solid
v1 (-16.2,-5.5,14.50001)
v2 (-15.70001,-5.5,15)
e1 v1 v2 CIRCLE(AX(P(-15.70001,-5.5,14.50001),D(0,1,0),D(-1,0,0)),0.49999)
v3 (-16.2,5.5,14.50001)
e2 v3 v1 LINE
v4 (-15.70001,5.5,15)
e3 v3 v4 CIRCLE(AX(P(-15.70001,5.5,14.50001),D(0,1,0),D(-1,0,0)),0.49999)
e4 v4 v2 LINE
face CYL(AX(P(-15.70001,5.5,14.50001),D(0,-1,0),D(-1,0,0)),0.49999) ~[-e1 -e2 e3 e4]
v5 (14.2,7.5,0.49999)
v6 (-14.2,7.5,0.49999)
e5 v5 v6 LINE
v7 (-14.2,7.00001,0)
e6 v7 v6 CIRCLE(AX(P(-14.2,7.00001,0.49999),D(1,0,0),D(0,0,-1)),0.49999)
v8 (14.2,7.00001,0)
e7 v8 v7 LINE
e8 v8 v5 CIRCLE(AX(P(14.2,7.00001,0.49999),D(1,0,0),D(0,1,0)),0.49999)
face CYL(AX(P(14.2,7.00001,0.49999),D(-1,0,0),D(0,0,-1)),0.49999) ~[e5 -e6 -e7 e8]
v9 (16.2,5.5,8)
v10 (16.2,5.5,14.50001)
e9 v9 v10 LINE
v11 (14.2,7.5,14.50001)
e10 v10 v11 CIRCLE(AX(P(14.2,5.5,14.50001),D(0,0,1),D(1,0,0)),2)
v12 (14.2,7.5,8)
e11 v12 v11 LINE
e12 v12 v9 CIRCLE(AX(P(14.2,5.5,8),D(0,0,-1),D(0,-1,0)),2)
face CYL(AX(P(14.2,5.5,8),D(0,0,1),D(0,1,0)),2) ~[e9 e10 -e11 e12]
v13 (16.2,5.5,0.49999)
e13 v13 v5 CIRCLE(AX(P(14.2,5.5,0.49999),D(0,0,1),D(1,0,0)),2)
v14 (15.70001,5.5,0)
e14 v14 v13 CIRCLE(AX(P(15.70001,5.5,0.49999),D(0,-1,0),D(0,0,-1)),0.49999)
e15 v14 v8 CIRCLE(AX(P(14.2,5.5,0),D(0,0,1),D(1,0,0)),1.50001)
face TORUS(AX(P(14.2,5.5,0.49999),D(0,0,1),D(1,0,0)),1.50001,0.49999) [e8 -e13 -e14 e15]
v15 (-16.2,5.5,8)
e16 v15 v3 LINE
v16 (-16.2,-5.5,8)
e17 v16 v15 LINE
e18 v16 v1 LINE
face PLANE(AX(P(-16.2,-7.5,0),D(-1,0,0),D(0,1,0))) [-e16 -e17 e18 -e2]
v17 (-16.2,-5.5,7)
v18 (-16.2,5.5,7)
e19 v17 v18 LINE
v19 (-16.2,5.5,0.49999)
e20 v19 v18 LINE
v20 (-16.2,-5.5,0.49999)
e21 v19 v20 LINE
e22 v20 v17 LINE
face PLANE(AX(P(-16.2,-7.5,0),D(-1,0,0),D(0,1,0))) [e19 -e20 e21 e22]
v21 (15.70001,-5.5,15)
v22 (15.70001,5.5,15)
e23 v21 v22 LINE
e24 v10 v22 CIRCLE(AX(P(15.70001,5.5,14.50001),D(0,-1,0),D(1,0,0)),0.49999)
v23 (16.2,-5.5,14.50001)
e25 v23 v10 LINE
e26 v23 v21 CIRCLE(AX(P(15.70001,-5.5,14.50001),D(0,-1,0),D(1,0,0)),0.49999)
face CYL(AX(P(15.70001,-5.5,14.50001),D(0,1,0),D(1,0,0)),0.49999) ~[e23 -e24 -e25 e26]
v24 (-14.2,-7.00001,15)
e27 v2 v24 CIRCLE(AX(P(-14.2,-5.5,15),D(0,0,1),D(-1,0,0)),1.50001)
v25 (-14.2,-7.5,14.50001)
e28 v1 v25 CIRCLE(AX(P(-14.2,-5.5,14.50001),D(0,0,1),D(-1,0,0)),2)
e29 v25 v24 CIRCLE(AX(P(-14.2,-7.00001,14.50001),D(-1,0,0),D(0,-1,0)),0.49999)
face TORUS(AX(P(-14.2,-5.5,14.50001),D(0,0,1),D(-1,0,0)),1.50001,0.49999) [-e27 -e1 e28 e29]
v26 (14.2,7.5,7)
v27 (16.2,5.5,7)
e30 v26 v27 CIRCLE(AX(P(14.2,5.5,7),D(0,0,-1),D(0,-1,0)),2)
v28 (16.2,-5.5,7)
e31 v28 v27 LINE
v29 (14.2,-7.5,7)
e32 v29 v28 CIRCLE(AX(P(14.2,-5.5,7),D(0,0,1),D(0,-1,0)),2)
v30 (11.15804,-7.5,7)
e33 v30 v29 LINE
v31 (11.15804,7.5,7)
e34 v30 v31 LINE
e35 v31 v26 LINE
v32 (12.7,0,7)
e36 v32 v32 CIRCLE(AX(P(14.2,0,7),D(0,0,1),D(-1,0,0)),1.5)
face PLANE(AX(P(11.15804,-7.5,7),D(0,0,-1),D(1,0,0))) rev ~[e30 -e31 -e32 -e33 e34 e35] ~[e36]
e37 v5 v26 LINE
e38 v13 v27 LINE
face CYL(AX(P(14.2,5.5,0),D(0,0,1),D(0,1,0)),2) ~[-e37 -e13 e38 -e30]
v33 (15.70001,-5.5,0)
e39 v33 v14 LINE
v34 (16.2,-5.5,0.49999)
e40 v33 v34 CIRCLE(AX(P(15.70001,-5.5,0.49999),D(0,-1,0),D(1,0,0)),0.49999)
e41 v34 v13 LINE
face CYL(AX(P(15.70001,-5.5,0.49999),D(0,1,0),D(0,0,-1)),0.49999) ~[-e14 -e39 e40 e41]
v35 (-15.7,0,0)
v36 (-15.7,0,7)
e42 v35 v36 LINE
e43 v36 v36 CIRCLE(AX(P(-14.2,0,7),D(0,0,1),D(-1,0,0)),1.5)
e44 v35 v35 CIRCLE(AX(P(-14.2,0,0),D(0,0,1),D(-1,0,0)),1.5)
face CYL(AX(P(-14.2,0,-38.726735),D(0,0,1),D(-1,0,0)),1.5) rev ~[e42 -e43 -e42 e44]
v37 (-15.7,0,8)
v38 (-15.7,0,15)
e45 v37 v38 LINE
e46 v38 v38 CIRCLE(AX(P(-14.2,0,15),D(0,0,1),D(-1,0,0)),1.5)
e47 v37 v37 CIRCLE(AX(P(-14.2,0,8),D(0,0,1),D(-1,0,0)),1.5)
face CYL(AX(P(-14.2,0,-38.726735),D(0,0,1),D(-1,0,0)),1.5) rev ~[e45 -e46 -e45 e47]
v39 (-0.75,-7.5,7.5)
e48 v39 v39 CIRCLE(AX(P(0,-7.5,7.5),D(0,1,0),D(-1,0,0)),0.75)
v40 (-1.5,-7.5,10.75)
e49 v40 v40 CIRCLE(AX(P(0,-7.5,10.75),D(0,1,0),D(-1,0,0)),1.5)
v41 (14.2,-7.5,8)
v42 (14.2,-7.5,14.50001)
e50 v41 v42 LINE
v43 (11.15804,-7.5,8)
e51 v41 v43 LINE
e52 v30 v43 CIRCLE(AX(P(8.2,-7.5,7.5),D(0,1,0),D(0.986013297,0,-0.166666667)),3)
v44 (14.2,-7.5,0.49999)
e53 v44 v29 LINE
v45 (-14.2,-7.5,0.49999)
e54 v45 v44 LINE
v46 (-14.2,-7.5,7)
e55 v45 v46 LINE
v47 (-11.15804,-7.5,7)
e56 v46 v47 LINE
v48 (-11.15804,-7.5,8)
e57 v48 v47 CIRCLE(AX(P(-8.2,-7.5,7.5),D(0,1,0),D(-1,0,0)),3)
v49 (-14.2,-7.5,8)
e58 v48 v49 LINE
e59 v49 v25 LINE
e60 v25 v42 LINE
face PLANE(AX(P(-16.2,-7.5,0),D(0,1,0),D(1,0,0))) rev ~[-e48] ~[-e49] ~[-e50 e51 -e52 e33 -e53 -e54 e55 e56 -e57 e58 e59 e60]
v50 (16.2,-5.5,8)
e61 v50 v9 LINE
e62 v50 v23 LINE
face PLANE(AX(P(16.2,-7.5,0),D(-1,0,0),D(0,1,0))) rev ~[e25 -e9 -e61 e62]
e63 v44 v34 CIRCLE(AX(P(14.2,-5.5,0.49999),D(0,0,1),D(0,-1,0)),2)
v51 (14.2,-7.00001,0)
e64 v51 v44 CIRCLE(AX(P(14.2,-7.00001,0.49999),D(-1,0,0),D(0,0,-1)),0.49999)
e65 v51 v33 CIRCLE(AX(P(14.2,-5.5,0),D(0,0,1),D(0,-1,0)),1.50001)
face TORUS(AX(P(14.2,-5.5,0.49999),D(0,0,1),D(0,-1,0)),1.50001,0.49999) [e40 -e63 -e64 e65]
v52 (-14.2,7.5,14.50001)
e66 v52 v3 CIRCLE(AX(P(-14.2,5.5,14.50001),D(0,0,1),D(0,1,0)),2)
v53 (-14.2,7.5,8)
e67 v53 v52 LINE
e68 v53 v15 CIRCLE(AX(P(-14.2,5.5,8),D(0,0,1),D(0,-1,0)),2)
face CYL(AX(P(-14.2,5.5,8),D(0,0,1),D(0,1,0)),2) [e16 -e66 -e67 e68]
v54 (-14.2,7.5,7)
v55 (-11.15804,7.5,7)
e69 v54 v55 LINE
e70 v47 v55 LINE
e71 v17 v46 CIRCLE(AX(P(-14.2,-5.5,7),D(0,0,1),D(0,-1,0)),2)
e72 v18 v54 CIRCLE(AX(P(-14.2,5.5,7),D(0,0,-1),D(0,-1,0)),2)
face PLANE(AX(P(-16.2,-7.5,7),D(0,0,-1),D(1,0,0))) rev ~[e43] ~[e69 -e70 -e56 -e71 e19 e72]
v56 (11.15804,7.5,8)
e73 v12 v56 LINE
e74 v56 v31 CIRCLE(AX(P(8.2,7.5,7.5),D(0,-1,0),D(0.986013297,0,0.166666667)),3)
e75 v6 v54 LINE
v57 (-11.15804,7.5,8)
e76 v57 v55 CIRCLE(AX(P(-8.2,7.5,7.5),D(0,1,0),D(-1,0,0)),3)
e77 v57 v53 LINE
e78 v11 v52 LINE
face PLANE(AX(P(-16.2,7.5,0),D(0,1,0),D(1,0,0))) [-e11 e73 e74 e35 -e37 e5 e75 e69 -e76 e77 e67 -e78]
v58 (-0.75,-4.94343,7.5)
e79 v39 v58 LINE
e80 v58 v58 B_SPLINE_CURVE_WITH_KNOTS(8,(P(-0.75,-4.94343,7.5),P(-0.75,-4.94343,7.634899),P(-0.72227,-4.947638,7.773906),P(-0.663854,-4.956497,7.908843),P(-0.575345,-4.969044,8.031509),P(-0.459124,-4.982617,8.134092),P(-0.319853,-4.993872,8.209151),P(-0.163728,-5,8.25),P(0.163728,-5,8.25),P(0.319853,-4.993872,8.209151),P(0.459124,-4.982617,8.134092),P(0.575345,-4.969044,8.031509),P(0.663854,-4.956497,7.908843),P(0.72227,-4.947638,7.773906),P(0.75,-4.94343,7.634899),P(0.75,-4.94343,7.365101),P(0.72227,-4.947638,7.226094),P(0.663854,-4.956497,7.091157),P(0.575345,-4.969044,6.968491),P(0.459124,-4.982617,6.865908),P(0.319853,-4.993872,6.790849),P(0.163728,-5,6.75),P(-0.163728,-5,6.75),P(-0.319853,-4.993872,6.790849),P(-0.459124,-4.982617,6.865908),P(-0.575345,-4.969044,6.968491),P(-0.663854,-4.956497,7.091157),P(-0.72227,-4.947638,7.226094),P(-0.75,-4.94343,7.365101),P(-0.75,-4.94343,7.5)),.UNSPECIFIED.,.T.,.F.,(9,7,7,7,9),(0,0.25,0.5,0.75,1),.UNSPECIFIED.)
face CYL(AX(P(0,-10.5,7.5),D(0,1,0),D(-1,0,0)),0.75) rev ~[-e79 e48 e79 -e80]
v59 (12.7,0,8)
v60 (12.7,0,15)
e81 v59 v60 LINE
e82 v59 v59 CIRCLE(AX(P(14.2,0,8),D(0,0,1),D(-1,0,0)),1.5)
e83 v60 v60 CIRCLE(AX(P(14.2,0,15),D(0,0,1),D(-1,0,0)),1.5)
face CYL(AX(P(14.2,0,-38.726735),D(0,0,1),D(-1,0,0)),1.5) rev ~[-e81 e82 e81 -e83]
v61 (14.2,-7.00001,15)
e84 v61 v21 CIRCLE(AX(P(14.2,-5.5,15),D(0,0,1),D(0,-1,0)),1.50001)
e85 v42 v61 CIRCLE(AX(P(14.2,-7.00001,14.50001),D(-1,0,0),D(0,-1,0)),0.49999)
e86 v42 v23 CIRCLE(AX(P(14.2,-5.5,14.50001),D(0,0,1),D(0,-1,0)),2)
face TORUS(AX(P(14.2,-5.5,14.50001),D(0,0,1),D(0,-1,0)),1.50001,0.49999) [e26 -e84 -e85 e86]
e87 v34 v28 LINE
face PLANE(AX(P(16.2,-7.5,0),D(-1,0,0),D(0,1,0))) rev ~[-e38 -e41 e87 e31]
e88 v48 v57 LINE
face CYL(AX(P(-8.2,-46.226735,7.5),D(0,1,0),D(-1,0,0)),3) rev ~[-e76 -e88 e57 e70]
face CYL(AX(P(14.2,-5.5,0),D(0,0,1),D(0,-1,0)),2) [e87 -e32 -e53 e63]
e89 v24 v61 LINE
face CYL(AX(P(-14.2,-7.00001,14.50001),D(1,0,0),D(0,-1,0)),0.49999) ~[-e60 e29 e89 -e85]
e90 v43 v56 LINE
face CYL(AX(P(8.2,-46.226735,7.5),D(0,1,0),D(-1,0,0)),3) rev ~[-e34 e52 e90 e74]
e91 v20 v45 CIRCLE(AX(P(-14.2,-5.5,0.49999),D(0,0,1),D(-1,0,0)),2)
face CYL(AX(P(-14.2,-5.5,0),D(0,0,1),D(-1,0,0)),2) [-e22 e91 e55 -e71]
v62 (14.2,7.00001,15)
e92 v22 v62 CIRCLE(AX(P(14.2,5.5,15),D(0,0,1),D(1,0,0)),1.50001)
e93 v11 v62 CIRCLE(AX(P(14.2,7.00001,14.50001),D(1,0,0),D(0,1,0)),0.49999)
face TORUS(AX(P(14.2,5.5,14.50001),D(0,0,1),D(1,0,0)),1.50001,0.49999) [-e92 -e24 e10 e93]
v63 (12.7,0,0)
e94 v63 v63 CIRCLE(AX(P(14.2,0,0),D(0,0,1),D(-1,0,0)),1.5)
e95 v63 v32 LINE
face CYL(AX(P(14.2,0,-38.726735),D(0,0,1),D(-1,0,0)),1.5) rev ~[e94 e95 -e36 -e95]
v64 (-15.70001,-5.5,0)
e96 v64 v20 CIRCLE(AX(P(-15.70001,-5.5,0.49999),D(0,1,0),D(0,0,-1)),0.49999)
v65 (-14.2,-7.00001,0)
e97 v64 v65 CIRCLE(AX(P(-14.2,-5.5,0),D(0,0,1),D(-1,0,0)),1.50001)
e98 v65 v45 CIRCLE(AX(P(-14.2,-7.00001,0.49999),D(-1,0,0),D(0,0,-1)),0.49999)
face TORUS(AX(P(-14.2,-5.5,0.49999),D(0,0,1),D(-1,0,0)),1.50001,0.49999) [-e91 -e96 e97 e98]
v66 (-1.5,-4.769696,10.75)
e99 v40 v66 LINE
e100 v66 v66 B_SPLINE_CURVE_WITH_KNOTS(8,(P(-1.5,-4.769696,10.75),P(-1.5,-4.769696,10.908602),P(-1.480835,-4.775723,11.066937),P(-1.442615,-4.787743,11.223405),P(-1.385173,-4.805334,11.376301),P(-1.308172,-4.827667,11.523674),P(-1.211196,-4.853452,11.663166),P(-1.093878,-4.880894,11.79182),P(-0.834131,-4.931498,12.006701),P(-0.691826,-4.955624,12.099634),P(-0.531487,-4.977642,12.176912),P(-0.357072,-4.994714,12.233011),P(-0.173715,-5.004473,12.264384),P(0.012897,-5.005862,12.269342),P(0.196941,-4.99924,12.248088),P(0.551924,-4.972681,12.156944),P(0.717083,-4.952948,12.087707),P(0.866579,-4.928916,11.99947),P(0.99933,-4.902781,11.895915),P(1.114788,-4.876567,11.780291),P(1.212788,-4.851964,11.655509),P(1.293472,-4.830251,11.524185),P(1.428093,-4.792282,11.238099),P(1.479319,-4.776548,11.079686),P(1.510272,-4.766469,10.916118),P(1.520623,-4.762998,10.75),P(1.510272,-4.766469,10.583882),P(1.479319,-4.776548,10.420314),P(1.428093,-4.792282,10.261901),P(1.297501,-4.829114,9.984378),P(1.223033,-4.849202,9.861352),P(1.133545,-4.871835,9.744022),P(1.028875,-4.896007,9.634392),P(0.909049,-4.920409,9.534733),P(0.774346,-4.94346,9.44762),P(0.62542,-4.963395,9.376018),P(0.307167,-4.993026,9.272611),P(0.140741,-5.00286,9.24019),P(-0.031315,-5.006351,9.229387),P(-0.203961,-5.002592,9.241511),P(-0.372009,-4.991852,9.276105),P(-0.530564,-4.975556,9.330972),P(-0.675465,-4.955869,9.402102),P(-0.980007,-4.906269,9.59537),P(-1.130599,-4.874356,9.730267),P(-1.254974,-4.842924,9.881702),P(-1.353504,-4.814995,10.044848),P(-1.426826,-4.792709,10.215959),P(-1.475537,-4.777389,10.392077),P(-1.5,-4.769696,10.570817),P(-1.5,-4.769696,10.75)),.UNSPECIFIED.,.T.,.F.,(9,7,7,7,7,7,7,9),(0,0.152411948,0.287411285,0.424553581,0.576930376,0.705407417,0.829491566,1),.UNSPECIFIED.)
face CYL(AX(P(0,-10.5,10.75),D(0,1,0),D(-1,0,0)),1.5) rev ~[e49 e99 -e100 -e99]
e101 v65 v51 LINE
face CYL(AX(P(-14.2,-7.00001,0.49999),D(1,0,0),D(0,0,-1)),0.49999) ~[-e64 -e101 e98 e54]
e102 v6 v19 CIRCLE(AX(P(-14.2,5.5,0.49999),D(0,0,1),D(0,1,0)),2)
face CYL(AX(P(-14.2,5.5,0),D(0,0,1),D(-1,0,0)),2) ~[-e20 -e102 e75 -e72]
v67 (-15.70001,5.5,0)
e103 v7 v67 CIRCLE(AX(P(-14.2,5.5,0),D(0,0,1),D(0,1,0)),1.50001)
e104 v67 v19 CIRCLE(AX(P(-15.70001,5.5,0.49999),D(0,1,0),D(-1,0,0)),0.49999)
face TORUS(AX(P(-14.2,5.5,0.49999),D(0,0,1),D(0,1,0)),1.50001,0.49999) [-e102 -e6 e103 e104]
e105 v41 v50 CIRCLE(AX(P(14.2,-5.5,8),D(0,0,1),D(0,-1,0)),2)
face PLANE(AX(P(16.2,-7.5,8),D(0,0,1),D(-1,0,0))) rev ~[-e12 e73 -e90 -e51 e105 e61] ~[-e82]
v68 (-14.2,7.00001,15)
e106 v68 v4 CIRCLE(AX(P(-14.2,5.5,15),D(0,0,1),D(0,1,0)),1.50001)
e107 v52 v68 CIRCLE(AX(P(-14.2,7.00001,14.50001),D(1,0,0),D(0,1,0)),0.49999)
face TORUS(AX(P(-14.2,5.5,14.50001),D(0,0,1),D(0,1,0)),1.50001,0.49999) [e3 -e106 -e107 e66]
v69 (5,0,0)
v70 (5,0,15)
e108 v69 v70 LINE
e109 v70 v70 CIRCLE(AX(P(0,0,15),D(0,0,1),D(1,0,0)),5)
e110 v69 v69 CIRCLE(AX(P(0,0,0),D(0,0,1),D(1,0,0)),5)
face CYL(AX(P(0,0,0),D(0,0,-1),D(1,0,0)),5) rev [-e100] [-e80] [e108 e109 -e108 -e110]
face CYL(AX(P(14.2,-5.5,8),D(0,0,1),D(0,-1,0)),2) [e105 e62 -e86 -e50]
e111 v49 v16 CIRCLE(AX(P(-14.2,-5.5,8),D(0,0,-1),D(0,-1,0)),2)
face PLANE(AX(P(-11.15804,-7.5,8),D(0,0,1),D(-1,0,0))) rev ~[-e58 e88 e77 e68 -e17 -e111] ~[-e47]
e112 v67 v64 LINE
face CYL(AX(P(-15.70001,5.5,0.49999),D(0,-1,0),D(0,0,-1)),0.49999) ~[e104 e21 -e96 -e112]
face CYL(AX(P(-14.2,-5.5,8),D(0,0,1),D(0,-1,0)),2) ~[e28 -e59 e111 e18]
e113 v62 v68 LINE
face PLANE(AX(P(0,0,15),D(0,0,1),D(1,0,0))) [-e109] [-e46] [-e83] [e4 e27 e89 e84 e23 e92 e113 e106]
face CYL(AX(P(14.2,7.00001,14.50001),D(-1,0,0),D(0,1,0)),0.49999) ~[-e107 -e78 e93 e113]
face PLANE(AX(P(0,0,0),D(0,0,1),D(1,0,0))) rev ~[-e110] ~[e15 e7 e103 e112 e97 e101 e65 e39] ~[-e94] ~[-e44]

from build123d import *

# Parameters (mm, degrees)
F0_W     = 32.4
F0_H     = 15
F0_R     = 5
F1_DEPTH = 15
F3_D     = 6
F4_D     = 6
F5_DEPTH = 15
F6_DEPTH = 15
F7_D     = 3
F8_D     = 1.5
F8_DEPTH = 3
F8_TIP   = 0.4506454643
F9_D     = 3
F9_DEPTH = 3
F9_TIP   = 0.9012909285
F10_R    = 2
F11_R    = 0.49999


# Not quite as in the source:
# - a fillet or chamfer is up to 0.001 mm smaller than in the source, because OpenCascade refuses the exact size


with BuildPart() as f1:
    # F0 (on Top) → F1 (new body)
    with BuildSketch(Plane.XY):
        Rectangle(F0_W, F0_H)
        Circle(F0_R, mode=Mode.SUBTRACT)
    extrude(amount=F1_DEPTH)

    # F3 (through all)
    with Locations(Plane.XZ.offset(7.5)):
        with Locations((-8.2, 7.5)):
            Hole(F3_D / 2)

    # F4 (through all)
    with Locations(Plane.XZ.offset(7.5)):
        with Locations((8.2, 7.5)):
            Hole(F4_D / 2)

    # F2 (on face) → F5 (cut, through all)
    with BuildSketch(Plane.XZ.offset(7.5)):
        with BuildLine():
            Line((-11.1580398915, 8), (-16.2, 8))
            Line((-16.2, 8), (-16.2, 7.5))
            Line((-16.2, 7.5), (-16.2, 7))
            Line((-16.2, 7), (-11.1580398915, 7))
            ThreePointArc((-11.1580398915, 7), (-11.2, 7.5), (-11.1580398915, 8))
        make_face()
    extrude(amount=-F5_DEPTH, mode=Mode.SUBTRACT)

    # F2 (on face) → F6 (cut, through all)
    with BuildSketch(Plane.XZ.offset(7.5)):
        with BuildLine():
            ThreePointArc((11.1580398915, 8), (11.1894915684, 7.7508787808), (11.2, 7.5))
            ThreePointArc((11.2, 7.5), (11.1894915684, 7.2491212192), (11.1580398915, 7))
            Line((11.1580398915, 7), (16.2, 7))
            Line((16.2, 7), (16.2, 7.5))
            Line((16.2, 7.5), (16.2, 8))
            Line((16.2, 8), (11.1580398915, 8))
        make_face()
    extrude(amount=-F6_DEPTH, mode=Mode.SUBTRACT)

    # F7 (through all)
    with Locations(Plane(origin=(0, 0, 0), x_dir=(1, 0, 0), z_dir=(0, 0, -1))):
        with Locations((-14.2, 0), (14.2, 0)):
            Hole(F7_D / 2)

    # F8
    with Locations(Plane.XZ.offset(7.5)):
        with Locations((0, 7.5)):
            Hole(F8_D / 2, depth=F8_DEPTH)
            with Locations((0, 0, -(F8_DEPTH + F8_TIP / 2))):  # 118° drill point
                Cone(0, F8_D / 2, F8_TIP, mode=Mode.SUBTRACT)

    # F9
    with Locations(Plane.XZ.offset(7.5)):
        with Locations((0, 10.75)):
            Hole(F9_D / 2, depth=F9_DEPTH)
            with Locations((0, 0, -(F9_DEPTH + F9_TIP / 2))):  # 118° drill point
                Cone(0, F9_D / 2, F9_TIP, mode=Mode.SUBTRACT)

    # F10
    f10_edges = [f1.edges().sort_by_distance(p)[0] for p in [
        (16.2, -7.5, 11.5),
        (16.2, -7.5, 3.5),
        (16.2, 7.5, 11.5),
        (16.2, 7.5, 3.5),
        (-16.2, -7.5, 3.5),
        (-16.2, -7.5, 11.5),
        (-16.2, 7.5, 3.5),
        (-16.2, 7.5, 11.5),
    ]]
    fillet(f10_edges, radius=F10_R)

    # F11 (radius 0.5 in the source; OpenCascade refuses exactly that, so slightly less here)
    f11_edges = [f1.edges().sort_by_distance(p)[0] for p in [
        (0, -7.5, 0),
        (0, 7.5, 0),
        (0, -7.5, 15),
        (0, 7.5, 15),
    ]]
    fillet(f11_edges, radius=F11_R)


solid = f1.part
